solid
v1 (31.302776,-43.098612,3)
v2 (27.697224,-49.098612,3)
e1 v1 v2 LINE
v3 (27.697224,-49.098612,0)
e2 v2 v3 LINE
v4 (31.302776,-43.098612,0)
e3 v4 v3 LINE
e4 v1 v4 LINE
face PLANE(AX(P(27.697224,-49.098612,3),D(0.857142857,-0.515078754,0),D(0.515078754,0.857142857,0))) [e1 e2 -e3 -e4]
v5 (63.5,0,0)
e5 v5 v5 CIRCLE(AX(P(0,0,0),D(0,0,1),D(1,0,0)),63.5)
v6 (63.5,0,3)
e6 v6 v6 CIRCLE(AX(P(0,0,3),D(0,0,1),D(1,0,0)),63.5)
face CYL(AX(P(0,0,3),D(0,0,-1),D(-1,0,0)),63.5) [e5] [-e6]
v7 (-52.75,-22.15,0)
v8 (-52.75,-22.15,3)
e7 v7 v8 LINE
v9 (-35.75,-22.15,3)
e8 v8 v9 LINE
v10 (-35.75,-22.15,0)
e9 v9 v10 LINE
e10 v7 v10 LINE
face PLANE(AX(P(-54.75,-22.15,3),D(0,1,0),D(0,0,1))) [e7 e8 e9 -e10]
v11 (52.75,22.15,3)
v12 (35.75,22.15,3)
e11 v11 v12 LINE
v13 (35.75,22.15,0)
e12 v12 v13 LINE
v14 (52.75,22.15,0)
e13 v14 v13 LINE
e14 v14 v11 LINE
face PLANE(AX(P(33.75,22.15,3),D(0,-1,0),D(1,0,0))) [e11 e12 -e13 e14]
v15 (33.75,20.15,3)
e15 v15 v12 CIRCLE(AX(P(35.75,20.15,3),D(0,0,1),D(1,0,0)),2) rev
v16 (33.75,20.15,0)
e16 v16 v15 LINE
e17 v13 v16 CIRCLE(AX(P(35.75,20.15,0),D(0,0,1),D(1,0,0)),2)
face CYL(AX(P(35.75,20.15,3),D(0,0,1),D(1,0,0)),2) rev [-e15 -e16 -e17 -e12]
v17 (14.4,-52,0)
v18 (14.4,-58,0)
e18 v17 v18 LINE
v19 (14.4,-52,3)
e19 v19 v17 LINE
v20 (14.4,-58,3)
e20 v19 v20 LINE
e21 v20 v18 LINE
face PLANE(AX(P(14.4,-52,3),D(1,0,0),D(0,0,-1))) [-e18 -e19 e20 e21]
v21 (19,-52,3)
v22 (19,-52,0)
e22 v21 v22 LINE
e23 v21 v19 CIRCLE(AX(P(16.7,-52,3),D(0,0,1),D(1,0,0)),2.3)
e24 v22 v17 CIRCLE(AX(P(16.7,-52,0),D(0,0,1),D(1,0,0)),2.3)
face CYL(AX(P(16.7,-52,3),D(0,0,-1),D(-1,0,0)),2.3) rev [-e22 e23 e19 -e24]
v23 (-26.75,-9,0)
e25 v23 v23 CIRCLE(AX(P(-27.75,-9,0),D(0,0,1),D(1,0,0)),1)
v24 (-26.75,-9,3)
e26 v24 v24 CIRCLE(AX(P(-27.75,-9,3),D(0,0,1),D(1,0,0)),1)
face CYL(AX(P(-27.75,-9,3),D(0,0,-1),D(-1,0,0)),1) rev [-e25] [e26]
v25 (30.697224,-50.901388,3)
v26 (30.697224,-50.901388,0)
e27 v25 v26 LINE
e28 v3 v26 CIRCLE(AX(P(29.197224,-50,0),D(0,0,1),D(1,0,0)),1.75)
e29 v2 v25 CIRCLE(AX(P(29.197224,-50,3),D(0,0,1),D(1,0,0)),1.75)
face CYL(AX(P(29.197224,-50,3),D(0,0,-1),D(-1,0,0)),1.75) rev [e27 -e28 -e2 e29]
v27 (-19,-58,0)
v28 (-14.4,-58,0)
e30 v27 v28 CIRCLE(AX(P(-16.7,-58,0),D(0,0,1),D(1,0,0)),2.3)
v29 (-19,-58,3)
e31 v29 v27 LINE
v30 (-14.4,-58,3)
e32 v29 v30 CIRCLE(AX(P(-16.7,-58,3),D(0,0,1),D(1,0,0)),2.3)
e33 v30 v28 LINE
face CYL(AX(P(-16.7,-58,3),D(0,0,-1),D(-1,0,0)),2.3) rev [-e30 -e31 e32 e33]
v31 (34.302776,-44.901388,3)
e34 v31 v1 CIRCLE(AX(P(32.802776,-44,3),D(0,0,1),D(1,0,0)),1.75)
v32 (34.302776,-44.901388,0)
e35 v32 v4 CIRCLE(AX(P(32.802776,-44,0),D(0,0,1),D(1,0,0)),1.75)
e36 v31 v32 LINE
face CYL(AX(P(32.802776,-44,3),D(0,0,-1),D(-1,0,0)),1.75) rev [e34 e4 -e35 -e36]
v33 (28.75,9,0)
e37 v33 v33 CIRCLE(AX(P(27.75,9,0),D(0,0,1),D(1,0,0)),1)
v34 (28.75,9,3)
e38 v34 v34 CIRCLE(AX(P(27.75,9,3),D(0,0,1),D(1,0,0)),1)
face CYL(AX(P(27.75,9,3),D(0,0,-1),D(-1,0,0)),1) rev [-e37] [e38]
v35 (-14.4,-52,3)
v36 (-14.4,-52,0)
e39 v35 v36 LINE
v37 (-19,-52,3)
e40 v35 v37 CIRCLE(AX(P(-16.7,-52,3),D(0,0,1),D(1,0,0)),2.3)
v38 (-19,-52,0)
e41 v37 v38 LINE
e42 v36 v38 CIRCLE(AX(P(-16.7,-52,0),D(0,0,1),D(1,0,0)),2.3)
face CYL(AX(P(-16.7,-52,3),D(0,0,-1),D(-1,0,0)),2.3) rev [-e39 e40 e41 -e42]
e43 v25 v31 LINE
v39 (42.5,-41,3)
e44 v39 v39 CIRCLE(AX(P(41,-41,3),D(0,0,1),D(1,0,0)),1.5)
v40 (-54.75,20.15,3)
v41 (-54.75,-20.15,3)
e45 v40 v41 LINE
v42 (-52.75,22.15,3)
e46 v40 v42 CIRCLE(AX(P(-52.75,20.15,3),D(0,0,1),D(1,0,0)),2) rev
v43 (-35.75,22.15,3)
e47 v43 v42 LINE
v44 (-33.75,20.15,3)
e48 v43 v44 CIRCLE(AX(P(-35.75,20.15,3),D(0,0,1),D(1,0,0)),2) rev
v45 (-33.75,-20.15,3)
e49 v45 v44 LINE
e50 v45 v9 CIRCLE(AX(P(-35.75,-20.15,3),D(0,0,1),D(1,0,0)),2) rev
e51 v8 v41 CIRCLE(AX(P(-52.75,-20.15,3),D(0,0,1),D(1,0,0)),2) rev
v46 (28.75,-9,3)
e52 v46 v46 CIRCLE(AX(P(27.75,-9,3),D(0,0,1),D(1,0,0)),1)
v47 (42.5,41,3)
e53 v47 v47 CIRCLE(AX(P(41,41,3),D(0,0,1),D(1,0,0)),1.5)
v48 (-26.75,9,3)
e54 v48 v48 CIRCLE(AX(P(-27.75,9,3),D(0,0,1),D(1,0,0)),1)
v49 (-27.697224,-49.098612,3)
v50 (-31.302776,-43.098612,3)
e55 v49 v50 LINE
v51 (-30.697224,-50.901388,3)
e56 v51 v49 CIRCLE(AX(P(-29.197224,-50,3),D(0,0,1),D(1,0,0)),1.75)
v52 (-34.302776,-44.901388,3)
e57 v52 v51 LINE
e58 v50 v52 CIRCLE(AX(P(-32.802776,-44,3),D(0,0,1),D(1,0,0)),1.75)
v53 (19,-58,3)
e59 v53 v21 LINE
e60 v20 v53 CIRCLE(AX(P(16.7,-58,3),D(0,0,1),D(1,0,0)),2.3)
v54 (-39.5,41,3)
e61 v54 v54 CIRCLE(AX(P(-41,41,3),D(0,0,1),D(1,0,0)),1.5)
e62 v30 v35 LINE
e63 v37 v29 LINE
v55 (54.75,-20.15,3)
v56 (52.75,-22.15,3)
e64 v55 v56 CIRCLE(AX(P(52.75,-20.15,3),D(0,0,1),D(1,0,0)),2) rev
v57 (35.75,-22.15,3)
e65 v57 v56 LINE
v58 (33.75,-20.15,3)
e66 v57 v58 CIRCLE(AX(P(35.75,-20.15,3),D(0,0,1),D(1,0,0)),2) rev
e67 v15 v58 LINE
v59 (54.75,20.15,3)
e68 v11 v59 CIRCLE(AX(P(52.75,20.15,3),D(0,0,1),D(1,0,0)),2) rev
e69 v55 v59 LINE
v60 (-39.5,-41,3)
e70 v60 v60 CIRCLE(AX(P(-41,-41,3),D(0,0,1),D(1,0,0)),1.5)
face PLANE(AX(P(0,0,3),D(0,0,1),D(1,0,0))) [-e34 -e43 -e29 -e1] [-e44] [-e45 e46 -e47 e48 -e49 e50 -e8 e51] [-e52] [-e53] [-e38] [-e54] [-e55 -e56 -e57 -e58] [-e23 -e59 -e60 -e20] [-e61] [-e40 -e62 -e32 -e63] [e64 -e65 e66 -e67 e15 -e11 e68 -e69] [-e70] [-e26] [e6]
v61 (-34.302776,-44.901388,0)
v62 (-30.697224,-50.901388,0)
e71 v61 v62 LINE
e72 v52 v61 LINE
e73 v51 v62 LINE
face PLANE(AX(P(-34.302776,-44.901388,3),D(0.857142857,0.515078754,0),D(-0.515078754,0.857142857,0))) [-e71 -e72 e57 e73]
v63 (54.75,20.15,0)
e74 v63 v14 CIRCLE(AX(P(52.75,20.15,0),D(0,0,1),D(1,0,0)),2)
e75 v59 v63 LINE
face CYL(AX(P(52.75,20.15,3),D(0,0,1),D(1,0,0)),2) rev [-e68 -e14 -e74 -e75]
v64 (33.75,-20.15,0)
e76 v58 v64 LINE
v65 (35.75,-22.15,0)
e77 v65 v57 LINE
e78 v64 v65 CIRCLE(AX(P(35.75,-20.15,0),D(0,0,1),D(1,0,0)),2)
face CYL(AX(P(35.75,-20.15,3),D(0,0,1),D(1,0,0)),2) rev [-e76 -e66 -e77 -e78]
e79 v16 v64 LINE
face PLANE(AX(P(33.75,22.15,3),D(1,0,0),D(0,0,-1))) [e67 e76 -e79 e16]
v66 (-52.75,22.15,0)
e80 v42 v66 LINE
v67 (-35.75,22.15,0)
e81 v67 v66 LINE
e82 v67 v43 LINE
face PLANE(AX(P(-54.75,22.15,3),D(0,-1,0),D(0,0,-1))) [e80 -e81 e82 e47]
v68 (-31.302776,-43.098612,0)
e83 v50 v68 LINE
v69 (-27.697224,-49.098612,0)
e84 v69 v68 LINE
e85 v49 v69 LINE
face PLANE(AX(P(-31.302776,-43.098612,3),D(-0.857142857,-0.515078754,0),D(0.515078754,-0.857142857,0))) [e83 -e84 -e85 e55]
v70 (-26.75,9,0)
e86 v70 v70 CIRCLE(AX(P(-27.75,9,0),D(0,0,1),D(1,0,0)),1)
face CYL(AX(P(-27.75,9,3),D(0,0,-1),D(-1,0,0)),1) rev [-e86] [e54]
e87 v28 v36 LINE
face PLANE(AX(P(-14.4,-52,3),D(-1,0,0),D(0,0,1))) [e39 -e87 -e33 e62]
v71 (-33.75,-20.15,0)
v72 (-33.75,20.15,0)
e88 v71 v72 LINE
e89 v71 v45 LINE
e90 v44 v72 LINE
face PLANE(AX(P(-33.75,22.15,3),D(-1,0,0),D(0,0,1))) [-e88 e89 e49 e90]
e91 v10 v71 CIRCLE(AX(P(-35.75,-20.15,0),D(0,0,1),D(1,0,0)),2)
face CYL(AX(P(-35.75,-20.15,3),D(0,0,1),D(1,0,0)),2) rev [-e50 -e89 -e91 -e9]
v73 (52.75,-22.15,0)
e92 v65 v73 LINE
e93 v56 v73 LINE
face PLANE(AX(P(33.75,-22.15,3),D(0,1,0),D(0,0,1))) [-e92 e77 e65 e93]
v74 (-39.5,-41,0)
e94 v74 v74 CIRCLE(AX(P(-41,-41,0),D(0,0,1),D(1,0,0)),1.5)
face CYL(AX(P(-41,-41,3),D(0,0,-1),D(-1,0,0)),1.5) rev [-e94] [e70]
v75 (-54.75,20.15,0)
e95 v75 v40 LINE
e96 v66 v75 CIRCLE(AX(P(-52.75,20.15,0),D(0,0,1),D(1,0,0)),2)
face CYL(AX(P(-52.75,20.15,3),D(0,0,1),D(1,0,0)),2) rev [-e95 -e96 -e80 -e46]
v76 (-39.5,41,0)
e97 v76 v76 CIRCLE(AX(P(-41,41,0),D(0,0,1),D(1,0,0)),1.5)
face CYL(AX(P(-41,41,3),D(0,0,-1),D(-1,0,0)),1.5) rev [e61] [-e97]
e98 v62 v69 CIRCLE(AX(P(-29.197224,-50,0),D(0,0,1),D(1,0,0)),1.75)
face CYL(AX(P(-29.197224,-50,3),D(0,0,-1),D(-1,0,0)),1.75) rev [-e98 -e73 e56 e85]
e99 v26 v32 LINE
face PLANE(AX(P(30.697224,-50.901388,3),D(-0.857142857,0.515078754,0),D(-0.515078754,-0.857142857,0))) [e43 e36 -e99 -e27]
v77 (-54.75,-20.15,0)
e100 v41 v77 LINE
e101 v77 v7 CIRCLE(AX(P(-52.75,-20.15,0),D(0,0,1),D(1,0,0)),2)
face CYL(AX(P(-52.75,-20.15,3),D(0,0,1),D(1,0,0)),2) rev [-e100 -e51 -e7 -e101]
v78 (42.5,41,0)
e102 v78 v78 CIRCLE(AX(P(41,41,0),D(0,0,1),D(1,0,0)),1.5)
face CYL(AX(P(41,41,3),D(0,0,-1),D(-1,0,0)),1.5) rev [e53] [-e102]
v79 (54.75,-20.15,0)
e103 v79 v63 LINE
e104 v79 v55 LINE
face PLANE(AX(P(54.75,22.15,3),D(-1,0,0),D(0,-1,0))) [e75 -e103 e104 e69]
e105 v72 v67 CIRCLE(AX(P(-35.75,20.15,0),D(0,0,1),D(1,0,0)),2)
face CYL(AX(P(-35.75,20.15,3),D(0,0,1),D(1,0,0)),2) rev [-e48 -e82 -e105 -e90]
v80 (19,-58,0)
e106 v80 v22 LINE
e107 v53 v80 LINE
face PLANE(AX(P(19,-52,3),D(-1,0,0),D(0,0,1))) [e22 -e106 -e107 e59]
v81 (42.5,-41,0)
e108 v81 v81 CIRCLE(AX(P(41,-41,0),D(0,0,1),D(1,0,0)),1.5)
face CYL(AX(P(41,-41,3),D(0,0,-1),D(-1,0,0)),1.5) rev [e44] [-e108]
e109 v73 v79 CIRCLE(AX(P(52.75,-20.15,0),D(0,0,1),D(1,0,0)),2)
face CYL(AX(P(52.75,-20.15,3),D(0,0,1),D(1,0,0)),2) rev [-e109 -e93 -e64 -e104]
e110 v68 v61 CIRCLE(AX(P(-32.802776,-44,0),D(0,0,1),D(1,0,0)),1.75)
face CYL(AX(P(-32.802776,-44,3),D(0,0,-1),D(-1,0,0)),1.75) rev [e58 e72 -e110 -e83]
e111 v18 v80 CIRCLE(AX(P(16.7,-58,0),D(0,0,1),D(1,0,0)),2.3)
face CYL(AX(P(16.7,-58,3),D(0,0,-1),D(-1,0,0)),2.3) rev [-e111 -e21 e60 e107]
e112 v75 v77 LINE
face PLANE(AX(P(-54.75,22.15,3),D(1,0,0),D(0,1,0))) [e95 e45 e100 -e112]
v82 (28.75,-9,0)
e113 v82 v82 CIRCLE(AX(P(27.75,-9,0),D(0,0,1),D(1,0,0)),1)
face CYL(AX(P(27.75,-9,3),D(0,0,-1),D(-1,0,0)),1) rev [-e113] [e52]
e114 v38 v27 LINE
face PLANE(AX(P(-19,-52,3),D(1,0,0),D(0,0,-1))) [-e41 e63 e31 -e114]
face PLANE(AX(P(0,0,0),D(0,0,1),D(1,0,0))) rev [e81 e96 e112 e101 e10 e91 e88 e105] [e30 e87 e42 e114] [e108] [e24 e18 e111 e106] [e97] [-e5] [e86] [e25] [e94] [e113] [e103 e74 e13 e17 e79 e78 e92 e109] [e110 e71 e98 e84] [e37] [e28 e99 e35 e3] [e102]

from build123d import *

# Parameters (mm, degrees)
BOSS_EXTRUDE1_OUTLINE_R   = 63.5
BOSS_EXTRUDE1_OUTLINE_R_2 = 1.5
BOSS_EXTRUDE1_OUTLINE_R_3 = 1
BOSS_EXTRUDE1_OUTLINE_W   = 21
BOSS_EXTRUDE1_OUTLINE_H   = 44.3
BOSS_EXTRUDE1_DEPTH       = 3
FILLET1_R                 = 2


# Read off the part's stored shape, not the designer's step: Boss-Extrude1
with BuildPart() as part:
    # Boss-Extrude1 outline → Boss-Extrude1 (new body)
    with BuildSketch(Plane.XY):
        Circle(BOSS_EXTRUDE1_OUTLINE_R)
        with Locations((-41, -41)):
            Circle(BOSS_EXTRUDE1_OUTLINE_R_2, mode=Mode.SUBTRACT)
        with BuildLine():
            Line((-19, -58), (-19, -52))
            ThreePointArc((-19, -52), (-16.7, -49.7), (-14.4, -52))
            Line((-14.4, -52), (-14.4, -58))
            ThreePointArc((-14.4, -58), (-16.7, -60.3), (-19, -58))
        make_face(mode=Mode.SUBTRACT)
        with BuildLine():
            Line((-30.697224362, -50.901387819), (-34.302775638, -44.901387819))
            ThreePointArc((-34.302775638, -44.901387819), (-33.704163457, -42.5), (-31.302775638, -43.098612181))
            Line((-31.302775638, -43.098612181), (-27.697224362, -49.098612181))
            ThreePointArc((-27.697224362, -49.098612181), (-28.295836543, -51.5), (-30.697224362, -50.901387819))
        make_face(mode=Mode.SUBTRACT)
        with Locations((-27.75, -9)):
            Circle(BOSS_EXTRUDE1_OUTLINE_R_3, mode=Mode.SUBTRACT)
        with BuildLine():
            Line((14.4, -58), (14.4, -52))
            ThreePointArc((14.4, -52), (16.7, -49.7), (19, -52))
            Line((19, -52), (19, -58))
            ThreePointArc((19, -58), (16.7, -60.3), (14.4, -58))
        make_face(mode=Mode.SUBTRACT)
        with BuildLine():
            Line((34.302775638, -44.901387819), (30.697224362, -50.901387819))
            ThreePointArc((30.697224362, -50.901387819), (28.295836543, -51.5), (27.697224362, -49.098612181))
            Line((27.697224362, -49.098612181), (31.302775638, -43.098612181))
            ThreePointArc((31.302775638, -43.098612181), (33.704163457, -42.5), (34.302775638, -44.901387819))
        make_face(mode=Mode.SUBTRACT)
        with Locations((41, -41)):
            Circle(BOSS_EXTRUDE1_OUTLINE_R_2, mode=Mode.SUBTRACT)
        with Locations((27.75, -9)):
            Circle(BOSS_EXTRUDE1_OUTLINE_R_3, mode=Mode.SUBTRACT)
        with Locations((-44.25, 0)):
            Rectangle(BOSS_EXTRUDE1_OUTLINE_W, BOSS_EXTRUDE1_OUTLINE_H, mode=Mode.SUBTRACT)
        with Locations((-27.75, 9)):
            Circle(BOSS_EXTRUDE1_OUTLINE_R_3, mode=Mode.SUBTRACT)
        with Locations((-41, 41)):
            Circle(BOSS_EXTRUDE1_OUTLINE_R_2, mode=Mode.SUBTRACT)
        with Locations((27.75, 9)):
            Circle(BOSS_EXTRUDE1_OUTLINE_R_3, mode=Mode.SUBTRACT)
        with Locations((44.25, 0)):
            Rectangle(BOSS_EXTRUDE1_OUTLINE_W, BOSS_EXTRUDE1_OUTLINE_H, mode=Mode.SUBTRACT)
        with Locations((41, 41)):
            Circle(BOSS_EXTRUDE1_OUTLINE_R_2, mode=Mode.SUBTRACT)
    extrude(amount=BOSS_EXTRUDE1_DEPTH)

    # Fillet1
    fillet1_edges = [part.edges().sort_by_distance(p)[0] for p in [
        (-54.75, 22.15, 1.5),
        (-54.75, -22.15, 1.5),
        (-33.75, -22.15, 1.5),
        (-33.75, 22.15, 1.5),
        (33.75, 22.15, 1.5),
        (33.75, -22.15, 1.5),
        (54.75, -22.15, 1.5),
        (54.75, 22.15, 1.5),
    ]]
    fillet(fillet1_edges, radius=FILLET1_R)


solid = part.part
